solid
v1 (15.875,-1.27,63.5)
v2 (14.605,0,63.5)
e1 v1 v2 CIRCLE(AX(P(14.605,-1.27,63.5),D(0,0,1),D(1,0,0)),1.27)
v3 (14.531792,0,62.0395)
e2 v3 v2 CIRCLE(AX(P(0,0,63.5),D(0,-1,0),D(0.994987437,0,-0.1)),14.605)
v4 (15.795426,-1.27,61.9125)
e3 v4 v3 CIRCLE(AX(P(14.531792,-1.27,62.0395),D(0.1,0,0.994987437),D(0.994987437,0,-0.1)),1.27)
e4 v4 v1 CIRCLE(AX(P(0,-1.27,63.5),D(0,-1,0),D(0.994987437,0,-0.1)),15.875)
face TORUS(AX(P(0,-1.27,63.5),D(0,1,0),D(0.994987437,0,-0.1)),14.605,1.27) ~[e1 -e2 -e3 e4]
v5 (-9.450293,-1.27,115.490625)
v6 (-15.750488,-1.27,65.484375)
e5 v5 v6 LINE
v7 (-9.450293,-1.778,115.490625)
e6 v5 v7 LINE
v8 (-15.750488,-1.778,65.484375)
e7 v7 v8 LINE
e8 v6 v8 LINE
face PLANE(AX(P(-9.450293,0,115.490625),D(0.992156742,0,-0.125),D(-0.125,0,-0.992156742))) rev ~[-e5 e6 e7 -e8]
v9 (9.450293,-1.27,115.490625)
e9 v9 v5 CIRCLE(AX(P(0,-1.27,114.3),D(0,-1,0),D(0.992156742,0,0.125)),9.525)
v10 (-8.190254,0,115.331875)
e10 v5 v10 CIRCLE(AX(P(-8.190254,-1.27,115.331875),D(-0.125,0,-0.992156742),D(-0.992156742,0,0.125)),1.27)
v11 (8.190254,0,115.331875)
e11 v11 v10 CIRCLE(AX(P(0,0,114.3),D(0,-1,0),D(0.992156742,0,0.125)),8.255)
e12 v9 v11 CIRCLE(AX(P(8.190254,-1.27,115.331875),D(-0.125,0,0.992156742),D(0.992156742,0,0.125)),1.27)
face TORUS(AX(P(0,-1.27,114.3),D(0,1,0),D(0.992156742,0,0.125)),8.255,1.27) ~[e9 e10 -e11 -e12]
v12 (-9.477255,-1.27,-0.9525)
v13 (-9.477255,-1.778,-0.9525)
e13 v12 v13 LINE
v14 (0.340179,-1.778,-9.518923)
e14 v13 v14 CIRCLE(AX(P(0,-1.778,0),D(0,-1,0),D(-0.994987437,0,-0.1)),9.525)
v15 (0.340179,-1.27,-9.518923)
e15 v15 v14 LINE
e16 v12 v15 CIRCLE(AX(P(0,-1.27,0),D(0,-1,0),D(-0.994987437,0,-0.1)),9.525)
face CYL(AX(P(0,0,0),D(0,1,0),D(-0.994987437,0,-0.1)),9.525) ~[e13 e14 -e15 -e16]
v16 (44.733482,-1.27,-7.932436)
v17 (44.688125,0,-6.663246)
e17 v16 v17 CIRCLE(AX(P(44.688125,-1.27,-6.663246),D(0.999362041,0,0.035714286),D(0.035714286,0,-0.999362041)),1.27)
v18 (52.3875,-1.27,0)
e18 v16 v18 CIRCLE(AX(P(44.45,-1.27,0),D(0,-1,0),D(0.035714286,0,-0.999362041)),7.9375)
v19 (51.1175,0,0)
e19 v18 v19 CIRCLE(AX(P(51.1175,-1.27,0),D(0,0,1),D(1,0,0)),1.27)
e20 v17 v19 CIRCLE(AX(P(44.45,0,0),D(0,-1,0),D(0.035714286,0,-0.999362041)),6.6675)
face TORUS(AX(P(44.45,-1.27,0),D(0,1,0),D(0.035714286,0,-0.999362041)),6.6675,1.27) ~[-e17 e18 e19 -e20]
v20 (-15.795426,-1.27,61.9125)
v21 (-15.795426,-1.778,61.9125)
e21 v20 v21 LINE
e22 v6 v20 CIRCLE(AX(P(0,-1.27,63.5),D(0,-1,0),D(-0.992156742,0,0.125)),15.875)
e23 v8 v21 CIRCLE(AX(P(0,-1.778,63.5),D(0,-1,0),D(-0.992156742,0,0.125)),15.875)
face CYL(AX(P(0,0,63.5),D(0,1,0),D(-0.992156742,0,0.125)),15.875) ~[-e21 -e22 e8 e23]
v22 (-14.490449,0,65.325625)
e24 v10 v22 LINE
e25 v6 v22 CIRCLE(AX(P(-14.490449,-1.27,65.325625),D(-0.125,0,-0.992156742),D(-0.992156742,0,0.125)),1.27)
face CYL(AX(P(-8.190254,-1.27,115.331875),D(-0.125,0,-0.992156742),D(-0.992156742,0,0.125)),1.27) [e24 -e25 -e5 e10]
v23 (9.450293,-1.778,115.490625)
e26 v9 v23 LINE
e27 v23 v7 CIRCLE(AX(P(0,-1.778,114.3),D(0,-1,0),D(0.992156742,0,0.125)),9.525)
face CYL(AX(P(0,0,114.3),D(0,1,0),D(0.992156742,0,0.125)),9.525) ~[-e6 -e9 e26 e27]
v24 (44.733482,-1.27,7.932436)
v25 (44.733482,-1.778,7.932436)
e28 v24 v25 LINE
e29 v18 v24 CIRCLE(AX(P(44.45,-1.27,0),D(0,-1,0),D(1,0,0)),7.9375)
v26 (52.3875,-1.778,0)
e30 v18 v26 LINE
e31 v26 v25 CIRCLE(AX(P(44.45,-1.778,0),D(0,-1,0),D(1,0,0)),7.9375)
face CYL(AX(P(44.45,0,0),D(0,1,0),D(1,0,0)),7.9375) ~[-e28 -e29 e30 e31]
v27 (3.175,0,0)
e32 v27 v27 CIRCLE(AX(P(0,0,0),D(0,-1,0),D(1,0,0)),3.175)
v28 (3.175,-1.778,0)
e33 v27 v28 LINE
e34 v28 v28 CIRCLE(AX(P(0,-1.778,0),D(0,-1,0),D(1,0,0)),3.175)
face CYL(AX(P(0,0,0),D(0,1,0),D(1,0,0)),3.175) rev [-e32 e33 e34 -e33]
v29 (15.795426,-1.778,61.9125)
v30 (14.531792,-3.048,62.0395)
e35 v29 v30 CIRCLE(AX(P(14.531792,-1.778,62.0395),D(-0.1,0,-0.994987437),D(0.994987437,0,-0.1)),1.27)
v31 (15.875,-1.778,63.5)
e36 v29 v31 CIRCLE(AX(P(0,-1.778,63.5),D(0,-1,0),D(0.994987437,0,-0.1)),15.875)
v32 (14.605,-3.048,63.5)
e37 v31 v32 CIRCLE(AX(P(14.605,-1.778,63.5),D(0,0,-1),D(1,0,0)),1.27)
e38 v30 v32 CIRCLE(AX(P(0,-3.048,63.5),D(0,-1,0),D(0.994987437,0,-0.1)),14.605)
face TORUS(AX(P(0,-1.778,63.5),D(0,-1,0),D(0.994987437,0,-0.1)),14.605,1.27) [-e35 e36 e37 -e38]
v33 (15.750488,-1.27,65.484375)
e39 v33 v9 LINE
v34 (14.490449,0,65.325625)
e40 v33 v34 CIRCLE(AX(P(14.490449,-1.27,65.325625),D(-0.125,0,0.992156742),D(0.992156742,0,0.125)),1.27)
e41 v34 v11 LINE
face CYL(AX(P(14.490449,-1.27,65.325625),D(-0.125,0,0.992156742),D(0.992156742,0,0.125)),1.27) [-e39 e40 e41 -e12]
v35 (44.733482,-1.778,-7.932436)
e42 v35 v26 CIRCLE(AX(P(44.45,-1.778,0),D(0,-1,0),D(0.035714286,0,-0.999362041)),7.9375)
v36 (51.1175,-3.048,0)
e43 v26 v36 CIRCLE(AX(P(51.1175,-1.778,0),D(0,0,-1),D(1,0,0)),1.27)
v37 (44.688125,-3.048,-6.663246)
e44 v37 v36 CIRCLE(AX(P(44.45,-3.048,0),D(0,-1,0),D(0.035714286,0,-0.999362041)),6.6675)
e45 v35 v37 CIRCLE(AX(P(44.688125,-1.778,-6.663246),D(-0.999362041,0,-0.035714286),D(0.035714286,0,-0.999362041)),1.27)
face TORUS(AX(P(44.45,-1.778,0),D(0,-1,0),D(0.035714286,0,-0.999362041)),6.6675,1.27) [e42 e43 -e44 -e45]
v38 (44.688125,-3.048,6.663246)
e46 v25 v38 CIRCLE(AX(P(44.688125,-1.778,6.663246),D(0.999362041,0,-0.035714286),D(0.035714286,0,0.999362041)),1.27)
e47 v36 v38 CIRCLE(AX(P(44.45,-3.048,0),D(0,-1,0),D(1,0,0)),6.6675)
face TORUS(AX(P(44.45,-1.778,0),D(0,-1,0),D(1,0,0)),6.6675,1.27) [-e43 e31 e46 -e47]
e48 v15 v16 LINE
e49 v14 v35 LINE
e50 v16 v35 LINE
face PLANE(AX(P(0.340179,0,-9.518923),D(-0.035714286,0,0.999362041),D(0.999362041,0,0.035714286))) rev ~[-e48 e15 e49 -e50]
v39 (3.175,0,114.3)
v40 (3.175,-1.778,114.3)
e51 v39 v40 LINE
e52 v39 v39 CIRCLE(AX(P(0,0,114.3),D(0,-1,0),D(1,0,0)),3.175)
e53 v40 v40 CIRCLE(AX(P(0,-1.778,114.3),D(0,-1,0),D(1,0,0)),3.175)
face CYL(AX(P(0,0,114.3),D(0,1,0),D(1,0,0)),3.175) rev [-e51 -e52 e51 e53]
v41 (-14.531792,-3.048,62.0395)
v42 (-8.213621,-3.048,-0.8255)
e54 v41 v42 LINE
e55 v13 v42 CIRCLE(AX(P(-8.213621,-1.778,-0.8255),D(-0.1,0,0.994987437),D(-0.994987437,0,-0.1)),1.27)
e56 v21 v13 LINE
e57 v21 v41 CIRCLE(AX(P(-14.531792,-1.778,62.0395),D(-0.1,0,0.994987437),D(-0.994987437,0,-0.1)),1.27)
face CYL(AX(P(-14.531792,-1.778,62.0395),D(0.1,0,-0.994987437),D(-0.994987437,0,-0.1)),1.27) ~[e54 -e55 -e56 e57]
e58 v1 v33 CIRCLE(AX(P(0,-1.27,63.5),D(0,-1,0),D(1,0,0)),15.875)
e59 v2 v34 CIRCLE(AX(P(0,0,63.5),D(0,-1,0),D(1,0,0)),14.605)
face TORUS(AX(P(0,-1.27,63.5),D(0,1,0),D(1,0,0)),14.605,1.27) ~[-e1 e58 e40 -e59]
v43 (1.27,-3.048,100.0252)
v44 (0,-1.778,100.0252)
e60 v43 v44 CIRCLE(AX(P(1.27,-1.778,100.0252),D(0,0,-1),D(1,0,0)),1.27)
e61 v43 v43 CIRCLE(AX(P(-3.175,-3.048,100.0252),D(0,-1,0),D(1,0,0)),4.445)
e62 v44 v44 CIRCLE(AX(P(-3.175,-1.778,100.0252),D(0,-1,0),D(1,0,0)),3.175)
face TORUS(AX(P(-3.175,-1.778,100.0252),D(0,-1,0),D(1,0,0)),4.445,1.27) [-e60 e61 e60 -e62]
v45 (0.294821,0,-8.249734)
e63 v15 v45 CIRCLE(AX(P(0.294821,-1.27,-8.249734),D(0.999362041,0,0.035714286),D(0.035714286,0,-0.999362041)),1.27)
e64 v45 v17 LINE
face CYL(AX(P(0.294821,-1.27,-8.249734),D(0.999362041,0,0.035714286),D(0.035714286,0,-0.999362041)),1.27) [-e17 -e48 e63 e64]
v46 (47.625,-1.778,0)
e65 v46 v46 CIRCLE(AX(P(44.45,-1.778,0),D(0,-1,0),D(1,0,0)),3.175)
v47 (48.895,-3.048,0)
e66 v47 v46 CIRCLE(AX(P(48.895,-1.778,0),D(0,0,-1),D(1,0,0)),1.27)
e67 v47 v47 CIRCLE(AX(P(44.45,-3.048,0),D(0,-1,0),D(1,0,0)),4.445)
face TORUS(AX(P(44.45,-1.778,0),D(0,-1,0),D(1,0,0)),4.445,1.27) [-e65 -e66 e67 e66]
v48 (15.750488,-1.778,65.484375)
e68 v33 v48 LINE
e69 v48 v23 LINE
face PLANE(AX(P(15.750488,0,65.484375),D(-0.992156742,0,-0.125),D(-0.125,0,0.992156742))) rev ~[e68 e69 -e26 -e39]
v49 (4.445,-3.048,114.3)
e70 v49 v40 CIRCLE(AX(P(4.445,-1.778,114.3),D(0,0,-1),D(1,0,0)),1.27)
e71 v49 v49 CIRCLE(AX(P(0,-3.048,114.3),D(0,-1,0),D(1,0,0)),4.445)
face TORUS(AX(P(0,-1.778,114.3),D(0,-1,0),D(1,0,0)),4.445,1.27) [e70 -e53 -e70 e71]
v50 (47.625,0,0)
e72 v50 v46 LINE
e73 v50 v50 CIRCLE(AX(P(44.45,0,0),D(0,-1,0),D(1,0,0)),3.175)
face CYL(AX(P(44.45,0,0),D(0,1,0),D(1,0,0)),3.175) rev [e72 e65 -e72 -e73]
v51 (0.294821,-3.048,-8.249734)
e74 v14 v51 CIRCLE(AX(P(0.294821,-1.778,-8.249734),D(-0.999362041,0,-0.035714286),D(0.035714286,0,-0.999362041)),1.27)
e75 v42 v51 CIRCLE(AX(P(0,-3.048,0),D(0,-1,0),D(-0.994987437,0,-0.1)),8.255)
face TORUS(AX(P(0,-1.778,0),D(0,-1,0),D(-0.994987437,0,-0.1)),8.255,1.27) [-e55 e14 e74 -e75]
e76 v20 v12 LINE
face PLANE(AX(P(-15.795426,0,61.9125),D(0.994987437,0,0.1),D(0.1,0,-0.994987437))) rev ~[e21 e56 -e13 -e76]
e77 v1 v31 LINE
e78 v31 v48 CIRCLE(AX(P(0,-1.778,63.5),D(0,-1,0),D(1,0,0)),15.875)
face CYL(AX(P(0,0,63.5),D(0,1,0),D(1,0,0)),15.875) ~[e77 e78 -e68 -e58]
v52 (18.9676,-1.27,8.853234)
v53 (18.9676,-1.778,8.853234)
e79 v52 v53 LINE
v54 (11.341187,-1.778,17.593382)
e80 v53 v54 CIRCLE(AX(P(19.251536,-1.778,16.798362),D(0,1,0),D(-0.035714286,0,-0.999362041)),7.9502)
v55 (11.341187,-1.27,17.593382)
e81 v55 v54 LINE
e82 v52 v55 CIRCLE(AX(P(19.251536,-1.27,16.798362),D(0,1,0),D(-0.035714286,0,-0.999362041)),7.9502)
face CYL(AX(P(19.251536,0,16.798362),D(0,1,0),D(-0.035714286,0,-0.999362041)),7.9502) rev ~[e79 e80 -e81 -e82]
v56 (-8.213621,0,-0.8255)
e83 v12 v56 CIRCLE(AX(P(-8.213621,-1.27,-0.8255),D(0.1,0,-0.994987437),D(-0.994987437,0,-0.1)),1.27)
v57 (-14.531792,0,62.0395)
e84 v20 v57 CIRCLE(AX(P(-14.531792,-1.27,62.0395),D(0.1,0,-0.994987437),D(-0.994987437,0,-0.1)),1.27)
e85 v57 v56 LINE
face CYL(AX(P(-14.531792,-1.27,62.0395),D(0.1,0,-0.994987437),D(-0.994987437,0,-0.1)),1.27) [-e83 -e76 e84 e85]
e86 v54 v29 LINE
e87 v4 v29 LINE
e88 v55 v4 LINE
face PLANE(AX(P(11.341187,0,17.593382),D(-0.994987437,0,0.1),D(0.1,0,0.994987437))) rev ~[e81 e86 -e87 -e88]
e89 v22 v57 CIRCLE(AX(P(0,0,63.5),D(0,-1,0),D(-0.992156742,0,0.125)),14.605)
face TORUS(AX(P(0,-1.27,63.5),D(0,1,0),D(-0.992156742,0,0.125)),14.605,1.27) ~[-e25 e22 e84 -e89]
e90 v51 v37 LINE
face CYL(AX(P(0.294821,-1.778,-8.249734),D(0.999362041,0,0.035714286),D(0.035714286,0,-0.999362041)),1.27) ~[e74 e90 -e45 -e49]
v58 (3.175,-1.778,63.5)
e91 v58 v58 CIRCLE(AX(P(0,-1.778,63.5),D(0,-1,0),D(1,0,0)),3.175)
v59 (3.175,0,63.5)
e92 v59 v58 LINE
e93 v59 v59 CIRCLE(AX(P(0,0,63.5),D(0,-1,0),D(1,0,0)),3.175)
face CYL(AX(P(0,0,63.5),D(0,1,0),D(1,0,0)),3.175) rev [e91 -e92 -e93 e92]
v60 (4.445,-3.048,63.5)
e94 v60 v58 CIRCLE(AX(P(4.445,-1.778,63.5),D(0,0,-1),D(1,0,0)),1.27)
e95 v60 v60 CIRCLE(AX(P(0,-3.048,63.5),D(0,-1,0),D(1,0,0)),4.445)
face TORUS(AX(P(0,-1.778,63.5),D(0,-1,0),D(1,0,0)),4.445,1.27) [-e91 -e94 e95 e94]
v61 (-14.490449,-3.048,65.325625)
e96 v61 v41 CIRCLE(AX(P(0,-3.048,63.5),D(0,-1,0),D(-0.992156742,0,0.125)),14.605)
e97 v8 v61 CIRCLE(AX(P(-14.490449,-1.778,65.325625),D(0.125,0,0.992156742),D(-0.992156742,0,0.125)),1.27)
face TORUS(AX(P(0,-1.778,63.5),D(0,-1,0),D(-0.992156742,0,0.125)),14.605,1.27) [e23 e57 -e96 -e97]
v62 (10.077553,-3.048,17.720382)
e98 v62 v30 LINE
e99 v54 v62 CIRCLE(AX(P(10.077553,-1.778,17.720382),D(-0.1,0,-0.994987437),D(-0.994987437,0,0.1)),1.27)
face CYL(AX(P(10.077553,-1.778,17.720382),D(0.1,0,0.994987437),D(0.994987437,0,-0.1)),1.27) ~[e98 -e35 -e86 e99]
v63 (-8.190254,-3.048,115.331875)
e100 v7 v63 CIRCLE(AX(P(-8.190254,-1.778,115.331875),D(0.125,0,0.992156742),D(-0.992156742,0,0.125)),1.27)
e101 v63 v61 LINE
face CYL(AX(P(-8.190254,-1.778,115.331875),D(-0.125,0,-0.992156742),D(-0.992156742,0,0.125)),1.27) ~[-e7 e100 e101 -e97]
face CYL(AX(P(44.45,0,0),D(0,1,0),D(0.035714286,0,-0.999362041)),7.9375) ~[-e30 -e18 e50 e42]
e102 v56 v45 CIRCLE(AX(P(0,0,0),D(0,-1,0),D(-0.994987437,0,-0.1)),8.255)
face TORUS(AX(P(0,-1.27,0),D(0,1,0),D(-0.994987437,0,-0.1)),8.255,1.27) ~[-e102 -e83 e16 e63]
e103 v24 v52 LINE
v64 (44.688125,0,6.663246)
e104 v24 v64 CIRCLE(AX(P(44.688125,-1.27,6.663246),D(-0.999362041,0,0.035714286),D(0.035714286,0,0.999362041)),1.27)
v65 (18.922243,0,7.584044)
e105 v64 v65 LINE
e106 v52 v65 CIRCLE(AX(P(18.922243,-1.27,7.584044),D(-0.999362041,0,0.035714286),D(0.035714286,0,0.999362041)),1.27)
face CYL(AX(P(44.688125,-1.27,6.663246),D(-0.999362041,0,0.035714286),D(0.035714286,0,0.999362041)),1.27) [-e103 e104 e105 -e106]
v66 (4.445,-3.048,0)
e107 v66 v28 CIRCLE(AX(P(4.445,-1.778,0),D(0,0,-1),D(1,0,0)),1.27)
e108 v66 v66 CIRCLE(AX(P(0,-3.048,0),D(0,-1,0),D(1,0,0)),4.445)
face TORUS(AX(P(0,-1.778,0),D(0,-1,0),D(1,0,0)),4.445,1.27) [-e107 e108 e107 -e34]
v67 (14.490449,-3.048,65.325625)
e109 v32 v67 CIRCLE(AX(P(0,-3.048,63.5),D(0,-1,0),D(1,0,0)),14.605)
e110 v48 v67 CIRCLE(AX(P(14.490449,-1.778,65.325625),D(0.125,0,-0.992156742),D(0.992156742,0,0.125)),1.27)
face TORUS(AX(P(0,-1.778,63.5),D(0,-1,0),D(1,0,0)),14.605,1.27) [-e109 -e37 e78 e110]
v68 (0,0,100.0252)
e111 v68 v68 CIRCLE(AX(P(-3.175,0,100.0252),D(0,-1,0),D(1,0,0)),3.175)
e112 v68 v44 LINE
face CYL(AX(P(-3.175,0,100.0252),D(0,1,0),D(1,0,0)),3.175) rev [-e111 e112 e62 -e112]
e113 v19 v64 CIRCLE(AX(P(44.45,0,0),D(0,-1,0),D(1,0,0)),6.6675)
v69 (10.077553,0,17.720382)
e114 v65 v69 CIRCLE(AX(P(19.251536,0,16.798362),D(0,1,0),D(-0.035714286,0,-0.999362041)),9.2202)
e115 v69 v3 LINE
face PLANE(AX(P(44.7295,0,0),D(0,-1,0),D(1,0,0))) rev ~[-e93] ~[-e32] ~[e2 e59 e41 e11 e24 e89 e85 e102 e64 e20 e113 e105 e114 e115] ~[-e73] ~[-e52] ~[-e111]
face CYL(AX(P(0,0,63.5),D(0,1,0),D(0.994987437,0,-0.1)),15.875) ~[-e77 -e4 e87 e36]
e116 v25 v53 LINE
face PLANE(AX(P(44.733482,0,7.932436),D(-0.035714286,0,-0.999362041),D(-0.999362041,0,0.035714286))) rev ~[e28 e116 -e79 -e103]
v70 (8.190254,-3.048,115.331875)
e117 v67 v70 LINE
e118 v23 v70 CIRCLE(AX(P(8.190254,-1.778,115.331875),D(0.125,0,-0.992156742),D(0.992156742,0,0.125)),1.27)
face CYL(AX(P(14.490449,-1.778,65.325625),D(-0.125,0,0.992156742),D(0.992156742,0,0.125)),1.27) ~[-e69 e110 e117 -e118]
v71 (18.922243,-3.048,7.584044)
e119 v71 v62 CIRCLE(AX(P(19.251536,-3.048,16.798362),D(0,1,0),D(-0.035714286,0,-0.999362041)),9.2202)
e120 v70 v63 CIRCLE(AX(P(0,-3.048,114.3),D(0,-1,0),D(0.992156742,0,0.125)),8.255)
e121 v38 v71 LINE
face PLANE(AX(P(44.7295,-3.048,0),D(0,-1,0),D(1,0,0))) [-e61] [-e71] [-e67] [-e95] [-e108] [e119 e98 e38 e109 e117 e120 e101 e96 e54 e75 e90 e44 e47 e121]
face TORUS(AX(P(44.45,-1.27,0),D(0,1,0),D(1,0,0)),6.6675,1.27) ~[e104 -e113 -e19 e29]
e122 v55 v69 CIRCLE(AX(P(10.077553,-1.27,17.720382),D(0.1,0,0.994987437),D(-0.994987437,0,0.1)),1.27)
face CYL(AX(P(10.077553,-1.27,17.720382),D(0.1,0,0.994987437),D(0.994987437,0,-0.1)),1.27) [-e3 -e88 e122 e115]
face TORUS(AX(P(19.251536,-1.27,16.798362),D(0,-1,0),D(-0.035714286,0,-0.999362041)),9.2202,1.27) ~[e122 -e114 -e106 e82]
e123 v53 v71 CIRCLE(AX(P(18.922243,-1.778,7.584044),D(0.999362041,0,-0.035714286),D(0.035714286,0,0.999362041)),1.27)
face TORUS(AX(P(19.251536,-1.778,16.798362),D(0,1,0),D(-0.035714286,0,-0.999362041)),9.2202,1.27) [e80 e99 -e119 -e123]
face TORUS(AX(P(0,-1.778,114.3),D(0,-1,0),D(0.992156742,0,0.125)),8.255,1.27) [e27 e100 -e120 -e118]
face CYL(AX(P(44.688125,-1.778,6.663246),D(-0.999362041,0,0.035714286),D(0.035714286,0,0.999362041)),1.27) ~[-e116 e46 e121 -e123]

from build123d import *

# Parameters (mm, degrees)
F0_R     = 3.175
F1_DEPTH = 3.048
F2_R     = 1.27
F3_R     = 1.27


with BuildPart() as f1:
    # F0 (on Front) → F1 (new body)
    with BuildSketch(Plane.XZ):
        with BuildLine():
            ThreePointArc((44.7334821429, -7.9324362036), (50.1620069047, -5.5115227815), (52.3875, 0))
            ThreePointArc((52.3875, 0), (50.1620069047, 5.5115227815), (44.7334821429, 7.9324362036))
            ThreePointArc((44.7334821429, 7.9324362036), (36.5125, 0), (44.7334821429, -7.9324362036))
        make_face()
        with Locations((44.45, 0)):
            Circle(F0_R, mode=Mode.SUBTRACT)
        with BuildLine():
            ThreePointArc((44.7334821429, -7.9324362036), (36.5125, 0), (44.7334821429, 7.9324362036))
            Line((44.7334821429, 7.9324362036), (18.9676000005, 8.8532337108))
            ThreePointArc((18.9676000005, 8.8532337108), (13.2611998974, 11.5713591498), (11.3411865923, 17.5933818124))
            Line((11.3411865923, 17.5933818124), (15.7954255641, 61.9125))
            ThreePointArc((15.7954255641, 61.9125), (0, 47.625), (-15.7954255641, 61.9125))
            Line((-15.7954255641, 61.9125), (-9.4772553384, -0.9525))
            ThreePointArc((-9.4772553384, -0.9525), (-0.4768479324, 9.5130563464), (9.525, 0))
            ThreePointArc((9.525, 0), (6.8544082857, -6.6138273378), (0.3401785714, -9.5189234444))
            Line((0.3401785714, -9.5189234444), (44.7334821429, -7.9324362036))
        make_face()
        with BuildLine():
            ThreePointArc((-9.4772553384, -0.9525), (-6.2623833816, -7.1769199091), (0.3401785714, -9.5189234444))
            ThreePointArc((0.3401785714, -9.5189234444), (6.8544082857, -6.6138273378), (9.525, 0))
            ThreePointArc((9.525, 0), (-0.4768479324, 9.5130563464), (-9.4772553384, -0.9525))
        make_face()
        Circle(F0_R, mode=Mode.SUBTRACT)
        with BuildLine():
            ThreePointArc((-15.7954255641, 61.9125), (0, 47.625), (15.7954255641, 61.9125))
            ThreePointArc((15.7954255641, 61.9125), (15.8550939106, 62.7052534459), (15.875, 63.5))
            ThreePointArc((15.875, 63.5), (15.8438414904, 64.4941387366), (15.7504882737, 65.484375))
            ThreePointArc((15.7504882737, 65.484375), (0, 79.375), (-15.7504882737, 65.484375))
            ThreePointArc((-15.7504882737, 65.484375), (-15.8737438155, 63.6997054867), (-15.7954255641, 61.9125))
        make_face()
        with Locations((0, 63.5)):
            Circle(F0_R, mode=Mode.SUBTRACT)
        with BuildLine():
            Line((-9.4502929642, 115.490625), (-15.7504882737, 65.484375))
            ThreePointArc((-15.7504882737, 65.484375), (0, 79.375), (15.7504882737, 65.484375))
            Line((15.7504882737, 65.484375), (9.4502929642, 115.490625))
            ThreePointArc((9.4502929642, 115.490625), (9.5063048942, 114.896483242), (9.525, 114.3))
            ThreePointArc((9.525, 114.3), (-0.596483242, 104.7936951058), (-9.4502929642, 115.490625))
        make_face()
        with Locations((-3.175, 100.0252)):
            Circle(F0_R, mode=Mode.SUBTRACT)
        with BuildLine():
            ThreePointArc((9.4502929642, 115.490625), (0, 123.825), (-9.4502929642, 115.490625))
            ThreePointArc((-9.4502929642, 115.490625), (-0.596483242, 104.7936951058), (9.525, 114.3))
            ThreePointArc((9.525, 114.3), (9.5063048942, 114.896483242), (9.4502929642, 115.490625))
        make_face()
        with Locations((0, 114.3)):
            Circle(F0_R, mode=Mode.SUBTRACT)
    extrude(amount=F1_DEPTH)

    # F2
    f2_edges = [f1.edges().sort_by_distance(p)[0] for p in [
        (-12.63634, 0, 30.48),
    ]]
    fillet(f2_edges, radius=F2_R)

    # F3
    f3_edges = [f1.edges().sort_by_distance(p)[0] for p in [
        (52.3875, -3.048, 0),
        (31.850541, -3.048, 8.392835),
        (13.2612, -3.048, 11.571359),
        (13.568306, -3.048, 39.752941),
        (15.873744, -3.048, 63.699705),
        (12.600391, -3.048, 90.4875),
        (0, -3.048, 123.825),
        (-12.600391, -3.048, 90.4875),
        (-15.873744, -3.048, 63.699705),
        (-12.63634, -3.048, 30.48),
        (-6.262383, -3.048, -7.17692),
        (22.53683, -3.048, -8.72568),
        (41.275, -3.048, 0),
        (-3.175, -3.048, 0),
        (-3.175, -3.048, 63.5),
        (-6.35, -3.048, 100.0252),
        (-3.175, -3.048, 114.3),
    ]]
    fillet(f3_edges, radius=F3_R)


solid = f1.part
